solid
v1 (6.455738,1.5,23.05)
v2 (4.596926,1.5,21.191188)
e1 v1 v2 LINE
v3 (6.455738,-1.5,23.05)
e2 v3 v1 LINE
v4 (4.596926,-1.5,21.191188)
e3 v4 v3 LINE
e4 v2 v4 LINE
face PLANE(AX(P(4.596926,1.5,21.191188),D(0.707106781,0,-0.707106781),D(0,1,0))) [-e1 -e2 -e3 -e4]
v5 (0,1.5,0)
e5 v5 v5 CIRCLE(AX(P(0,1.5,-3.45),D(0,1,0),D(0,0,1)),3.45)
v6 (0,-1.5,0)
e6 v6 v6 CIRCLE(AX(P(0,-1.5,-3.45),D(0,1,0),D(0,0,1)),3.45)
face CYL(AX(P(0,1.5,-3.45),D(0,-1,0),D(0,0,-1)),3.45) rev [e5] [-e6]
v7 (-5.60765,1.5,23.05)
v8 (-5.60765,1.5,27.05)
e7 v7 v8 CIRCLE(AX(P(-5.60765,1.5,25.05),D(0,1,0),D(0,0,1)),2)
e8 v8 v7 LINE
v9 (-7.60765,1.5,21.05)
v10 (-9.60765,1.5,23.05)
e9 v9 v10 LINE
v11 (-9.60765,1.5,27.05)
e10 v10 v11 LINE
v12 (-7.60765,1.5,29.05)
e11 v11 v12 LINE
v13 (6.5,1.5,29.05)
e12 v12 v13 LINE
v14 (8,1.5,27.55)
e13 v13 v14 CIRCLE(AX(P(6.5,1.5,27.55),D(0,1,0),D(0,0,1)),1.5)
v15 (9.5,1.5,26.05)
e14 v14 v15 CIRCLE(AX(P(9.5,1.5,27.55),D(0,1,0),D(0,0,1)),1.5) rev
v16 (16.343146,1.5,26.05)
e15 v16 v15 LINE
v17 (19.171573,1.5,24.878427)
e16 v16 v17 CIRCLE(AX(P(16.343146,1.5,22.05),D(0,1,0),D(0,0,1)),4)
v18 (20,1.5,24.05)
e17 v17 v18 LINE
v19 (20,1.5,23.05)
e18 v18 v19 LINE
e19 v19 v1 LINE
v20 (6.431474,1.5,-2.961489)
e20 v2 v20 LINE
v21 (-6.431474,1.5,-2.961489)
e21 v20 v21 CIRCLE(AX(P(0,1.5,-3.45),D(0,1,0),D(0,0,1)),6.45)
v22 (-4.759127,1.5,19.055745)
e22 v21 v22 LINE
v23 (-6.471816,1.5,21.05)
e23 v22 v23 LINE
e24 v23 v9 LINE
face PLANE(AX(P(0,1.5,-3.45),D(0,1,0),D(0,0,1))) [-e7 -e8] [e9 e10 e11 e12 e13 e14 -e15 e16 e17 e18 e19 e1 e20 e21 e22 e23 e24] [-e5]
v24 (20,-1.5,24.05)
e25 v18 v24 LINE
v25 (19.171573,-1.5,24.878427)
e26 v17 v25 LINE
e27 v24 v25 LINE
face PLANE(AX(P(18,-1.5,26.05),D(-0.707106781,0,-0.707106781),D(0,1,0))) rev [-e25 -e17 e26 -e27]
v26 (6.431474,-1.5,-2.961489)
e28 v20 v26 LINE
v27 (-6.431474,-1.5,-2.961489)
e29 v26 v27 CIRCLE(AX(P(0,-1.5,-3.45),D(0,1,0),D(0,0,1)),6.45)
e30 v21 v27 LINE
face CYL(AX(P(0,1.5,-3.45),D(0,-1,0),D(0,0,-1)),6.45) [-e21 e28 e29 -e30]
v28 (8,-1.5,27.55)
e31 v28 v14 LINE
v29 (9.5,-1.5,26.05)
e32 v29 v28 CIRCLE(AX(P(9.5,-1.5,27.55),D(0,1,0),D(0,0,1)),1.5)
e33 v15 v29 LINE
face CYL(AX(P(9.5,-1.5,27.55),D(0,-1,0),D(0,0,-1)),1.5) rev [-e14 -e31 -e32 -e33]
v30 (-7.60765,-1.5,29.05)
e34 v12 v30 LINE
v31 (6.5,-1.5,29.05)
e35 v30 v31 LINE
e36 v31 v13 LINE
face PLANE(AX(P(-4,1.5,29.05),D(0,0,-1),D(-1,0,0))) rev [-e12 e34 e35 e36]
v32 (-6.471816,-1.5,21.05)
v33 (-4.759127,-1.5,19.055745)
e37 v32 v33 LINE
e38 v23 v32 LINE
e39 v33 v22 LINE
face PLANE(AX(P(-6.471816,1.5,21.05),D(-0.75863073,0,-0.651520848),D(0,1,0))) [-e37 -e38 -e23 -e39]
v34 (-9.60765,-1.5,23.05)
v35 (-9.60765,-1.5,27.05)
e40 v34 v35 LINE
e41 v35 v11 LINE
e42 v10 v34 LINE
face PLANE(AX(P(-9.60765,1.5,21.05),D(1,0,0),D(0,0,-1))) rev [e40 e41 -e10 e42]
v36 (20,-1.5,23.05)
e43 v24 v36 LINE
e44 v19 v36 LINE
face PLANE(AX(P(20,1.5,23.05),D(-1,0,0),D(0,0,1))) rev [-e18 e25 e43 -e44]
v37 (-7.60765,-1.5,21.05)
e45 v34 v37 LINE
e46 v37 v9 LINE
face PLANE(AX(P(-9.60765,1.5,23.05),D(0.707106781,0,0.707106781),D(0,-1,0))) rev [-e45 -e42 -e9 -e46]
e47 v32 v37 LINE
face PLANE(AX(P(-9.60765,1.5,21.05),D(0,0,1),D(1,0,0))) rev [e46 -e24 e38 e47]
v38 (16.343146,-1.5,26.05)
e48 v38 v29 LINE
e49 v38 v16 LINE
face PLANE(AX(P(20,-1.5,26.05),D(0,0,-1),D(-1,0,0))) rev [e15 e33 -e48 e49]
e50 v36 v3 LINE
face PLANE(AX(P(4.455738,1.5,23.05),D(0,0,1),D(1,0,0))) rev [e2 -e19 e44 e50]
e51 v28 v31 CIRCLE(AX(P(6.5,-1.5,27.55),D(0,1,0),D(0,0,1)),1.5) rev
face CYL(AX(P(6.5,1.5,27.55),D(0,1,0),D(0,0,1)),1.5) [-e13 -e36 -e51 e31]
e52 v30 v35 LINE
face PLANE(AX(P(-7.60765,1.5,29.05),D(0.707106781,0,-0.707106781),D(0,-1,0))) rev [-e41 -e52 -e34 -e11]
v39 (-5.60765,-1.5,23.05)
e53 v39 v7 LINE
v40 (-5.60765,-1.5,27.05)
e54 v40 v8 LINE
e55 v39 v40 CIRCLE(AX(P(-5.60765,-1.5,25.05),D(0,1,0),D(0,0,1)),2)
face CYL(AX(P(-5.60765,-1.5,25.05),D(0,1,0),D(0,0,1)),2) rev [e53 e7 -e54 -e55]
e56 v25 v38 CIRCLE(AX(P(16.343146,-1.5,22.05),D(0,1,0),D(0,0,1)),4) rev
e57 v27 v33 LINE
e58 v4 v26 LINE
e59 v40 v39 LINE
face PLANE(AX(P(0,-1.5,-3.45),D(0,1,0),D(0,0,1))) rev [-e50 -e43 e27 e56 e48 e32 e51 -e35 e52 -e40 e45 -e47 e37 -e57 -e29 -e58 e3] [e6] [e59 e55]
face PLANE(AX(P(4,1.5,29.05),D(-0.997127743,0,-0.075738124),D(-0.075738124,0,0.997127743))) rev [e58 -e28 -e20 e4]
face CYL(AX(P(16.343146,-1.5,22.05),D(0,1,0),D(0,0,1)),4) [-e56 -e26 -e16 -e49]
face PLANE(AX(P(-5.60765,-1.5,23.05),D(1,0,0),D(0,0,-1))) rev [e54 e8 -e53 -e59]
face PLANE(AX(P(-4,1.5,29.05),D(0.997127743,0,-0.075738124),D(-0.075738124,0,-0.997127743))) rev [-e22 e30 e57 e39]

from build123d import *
from OCP.BRepFilletAPI import BRepFilletAPI_MakeChamfer, BRepFilletAPI_MakeFillet

# Parameters (mm, degrees)
SKETCH1_R               = 3.45
BOSS_EXTRUDE1_DEPTH     = 1.5
BOSS_EXTRUDE2_DEPTH     = 1.5
CUT_EXTRUDE1_DEPTH      = 36.300885258
CUT_EXTRUDE1_DEPTH_BACK = 36.300885258
SKETCH3_W               = 12
SKETCH3_H               = 3
CHAMFER5_SIZE           = 2
FILLET6_R               = 4
FILLET6_R_2             = 1.5
CHAMFER6_SIZE           = 2
CUT_EXTRUDE2_DEPTH      = 36.300885258
CUT_EXTRUDE2_DEPTH_BACK = 36.300885258
CHAMFER7_SIZE           = 2
CHAMFER7_SIZE2          = 1.864165933


with BuildPart() as part:
    # Sketch1 → Boss-Extrude1 (new, symmetric)
    with BuildSketch(Plane(origin=(0, 0, 0), x_dir=(1, 0, 0), z_dir=(0, 1, 0))):
        with BuildLine():
            Line((-4, -29.05), (-6.431473945, 2.961489101))
            ThreePointArc((-6.431473945, 2.961489101), (0, 9.9), (6.431473945, 2.961489101))
            Line((6.431473945, 2.961489101), (4, -29.05))
            Line((4, -29.05), (-4, -29.05))
        make_face()
        with Locations(Location((0, 3.45, 0), (0, 0, 270))):
            Circle(SKETCH1_R, mode=Mode.SUBTRACT)
    extrude(amount=BOSS_EXTRUDE1_DEPTH, both=True)

    # Sketch2 → Boss-Extrude2 (add, symmetric)
    with BuildSketch(Plane(origin=(0, 0, 0), x_dir=(1, 0, 0), z_dir=(0, 1, 0))):
        Polygon((-4.607650319, -21.05), (-4, -29.05), (-9.607650319, -29.05), (-9.607650319, -21.05), align=None)
        Polygon((4.455737739, -23.05), (20, -23.05), (20, -29.05), (4, -29.05), align=None)
    extrude(amount=BOSS_EXTRUDE2_DEPTH, both=True)

    # Sketch3 → Cut-Extrude1 (cut, two sides: drawn at the far end of the back side and taken through both)
    with BuildSketch(Plane(origin=(0, 0, 0), x_dir=(1, 0, 0), z_dir=(0, 1, 0)).offset(-CUT_EXTRUDE1_DEPTH_BACK)):
        with Locations((14, -27.55)):
            Rectangle(SKETCH3_W, SKETCH3_H)
    extrude(amount=CUT_EXTRUDE1_DEPTH + CUT_EXTRUDE1_DEPTH_BACK, mode=Mode.SUBTRACT)

    # Chamfer5
    chamfer5_edges = [part.edges().sort_by_distance(p)[0] for p in [
        (20, 0, 26.05),
    ]]
    chamfer(chamfer5_edges, length=CHAMFER5_SIZE)

    # Fillet6
    fillet6_edges_1 = [part.edges().sort_by_distance(p)[0] for p in [
        (18, 0, 26.05),
    ]]
    fillet6_edges_2 = [part.edges().sort_by_distance(p)[0] for p in [
        (8, 0, 26.05),
        (8, 0, 29.05),
    ]]
    fillet6 = BRepFilletAPI_MakeFillet(part.part.solid().wrapped)
    for e in fillet6_edges_1:
        fillet6.Add(FILLET6_R - 0.0001, e.wrapped)
    for e in fillet6_edges_2:
        fillet6.Add(FILLET6_R_2 - 0.0001, e.wrapped)
    add(Compound.cast(fillet6.Shape()), mode=Mode.REPLACE)  # a hair under: the kernel refuses the full size

    # Chamfer6
    chamfer6_edges = [part.edges().sort_by_distance(p)[0] for p in [
        (-9.607650319, 0, 21.05),
        (-9.607650319, 0, 29.05),
    ]]
    chamfer(chamfer6_edges, length=CHAMFER6_SIZE)

    # Sketch4 → Cut-Extrude2 (cut, two sides: drawn at the far end of the back side and taken through both)
    with BuildSketch(Plane(origin=(0, 0, 0), x_dir=(1, 0, 0), z_dir=(0, 1, 0)).offset(-CUT_EXTRUDE2_DEPTH_BACK)):
        with BuildLine():
            Line((-5.607650319, -23.05), (-5.607650319, -27.05))
            ThreePointArc((-5.607650319, -27.05), (-7.607650319, -25.05), (-5.607650319, -23.05))
        make_face()
    extrude(amount=CUT_EXTRUDE2_DEPTH + CUT_EXTRUDE2_DEPTH_BACK, mode=Mode.SUBTRACT)

    # Chamfer7: one chamfer whose edges measure the first distance from different faces: ONE call of the kernel's chamfer builder (chamfer() names one face for all edges)
    chamfer7_edges_1 = [part.edges().sort_by_distance(p)[0] for p in [
        (4.455737739, 0, 23.05),
    ]]
    chamfer7_side_1 = [part.faces().sort_by_distance(p)[0] for p in [
        (12.22786887, 0, 23.05),
    ]]
    chamfer7_edges_2 = [part.edges().sort_by_distance(p)[0] for p in [
        (-4.607650319, 0, 21.05),
    ]]
    chamfer7_side_2 = [part.faces().sort_by_distance(p)[0] for p in [
        (-5.519562132, 0, 9.04425545),
    ]]
    chamfer7 = BRepFilletAPI_MakeChamfer(part.part.solid().wrapped)
    for e in chamfer7_edges_1:
        chamfer7.Add(CHAMFER7_SIZE, CHAMFER7_SIZE2, e.wrapped, chamfer7_side_1[0].wrapped)  # the first distance lies on this face
    for e in chamfer7_edges_2:
        chamfer7.Add(CHAMFER7_SIZE, CHAMFER7_SIZE2, e.wrapped, chamfer7_side_2[0].wrapped)  # the first distance lies on this face
    add(Compound.cast(chamfer7.Shape()), mode=Mode.REPLACE)


solid = part.part
